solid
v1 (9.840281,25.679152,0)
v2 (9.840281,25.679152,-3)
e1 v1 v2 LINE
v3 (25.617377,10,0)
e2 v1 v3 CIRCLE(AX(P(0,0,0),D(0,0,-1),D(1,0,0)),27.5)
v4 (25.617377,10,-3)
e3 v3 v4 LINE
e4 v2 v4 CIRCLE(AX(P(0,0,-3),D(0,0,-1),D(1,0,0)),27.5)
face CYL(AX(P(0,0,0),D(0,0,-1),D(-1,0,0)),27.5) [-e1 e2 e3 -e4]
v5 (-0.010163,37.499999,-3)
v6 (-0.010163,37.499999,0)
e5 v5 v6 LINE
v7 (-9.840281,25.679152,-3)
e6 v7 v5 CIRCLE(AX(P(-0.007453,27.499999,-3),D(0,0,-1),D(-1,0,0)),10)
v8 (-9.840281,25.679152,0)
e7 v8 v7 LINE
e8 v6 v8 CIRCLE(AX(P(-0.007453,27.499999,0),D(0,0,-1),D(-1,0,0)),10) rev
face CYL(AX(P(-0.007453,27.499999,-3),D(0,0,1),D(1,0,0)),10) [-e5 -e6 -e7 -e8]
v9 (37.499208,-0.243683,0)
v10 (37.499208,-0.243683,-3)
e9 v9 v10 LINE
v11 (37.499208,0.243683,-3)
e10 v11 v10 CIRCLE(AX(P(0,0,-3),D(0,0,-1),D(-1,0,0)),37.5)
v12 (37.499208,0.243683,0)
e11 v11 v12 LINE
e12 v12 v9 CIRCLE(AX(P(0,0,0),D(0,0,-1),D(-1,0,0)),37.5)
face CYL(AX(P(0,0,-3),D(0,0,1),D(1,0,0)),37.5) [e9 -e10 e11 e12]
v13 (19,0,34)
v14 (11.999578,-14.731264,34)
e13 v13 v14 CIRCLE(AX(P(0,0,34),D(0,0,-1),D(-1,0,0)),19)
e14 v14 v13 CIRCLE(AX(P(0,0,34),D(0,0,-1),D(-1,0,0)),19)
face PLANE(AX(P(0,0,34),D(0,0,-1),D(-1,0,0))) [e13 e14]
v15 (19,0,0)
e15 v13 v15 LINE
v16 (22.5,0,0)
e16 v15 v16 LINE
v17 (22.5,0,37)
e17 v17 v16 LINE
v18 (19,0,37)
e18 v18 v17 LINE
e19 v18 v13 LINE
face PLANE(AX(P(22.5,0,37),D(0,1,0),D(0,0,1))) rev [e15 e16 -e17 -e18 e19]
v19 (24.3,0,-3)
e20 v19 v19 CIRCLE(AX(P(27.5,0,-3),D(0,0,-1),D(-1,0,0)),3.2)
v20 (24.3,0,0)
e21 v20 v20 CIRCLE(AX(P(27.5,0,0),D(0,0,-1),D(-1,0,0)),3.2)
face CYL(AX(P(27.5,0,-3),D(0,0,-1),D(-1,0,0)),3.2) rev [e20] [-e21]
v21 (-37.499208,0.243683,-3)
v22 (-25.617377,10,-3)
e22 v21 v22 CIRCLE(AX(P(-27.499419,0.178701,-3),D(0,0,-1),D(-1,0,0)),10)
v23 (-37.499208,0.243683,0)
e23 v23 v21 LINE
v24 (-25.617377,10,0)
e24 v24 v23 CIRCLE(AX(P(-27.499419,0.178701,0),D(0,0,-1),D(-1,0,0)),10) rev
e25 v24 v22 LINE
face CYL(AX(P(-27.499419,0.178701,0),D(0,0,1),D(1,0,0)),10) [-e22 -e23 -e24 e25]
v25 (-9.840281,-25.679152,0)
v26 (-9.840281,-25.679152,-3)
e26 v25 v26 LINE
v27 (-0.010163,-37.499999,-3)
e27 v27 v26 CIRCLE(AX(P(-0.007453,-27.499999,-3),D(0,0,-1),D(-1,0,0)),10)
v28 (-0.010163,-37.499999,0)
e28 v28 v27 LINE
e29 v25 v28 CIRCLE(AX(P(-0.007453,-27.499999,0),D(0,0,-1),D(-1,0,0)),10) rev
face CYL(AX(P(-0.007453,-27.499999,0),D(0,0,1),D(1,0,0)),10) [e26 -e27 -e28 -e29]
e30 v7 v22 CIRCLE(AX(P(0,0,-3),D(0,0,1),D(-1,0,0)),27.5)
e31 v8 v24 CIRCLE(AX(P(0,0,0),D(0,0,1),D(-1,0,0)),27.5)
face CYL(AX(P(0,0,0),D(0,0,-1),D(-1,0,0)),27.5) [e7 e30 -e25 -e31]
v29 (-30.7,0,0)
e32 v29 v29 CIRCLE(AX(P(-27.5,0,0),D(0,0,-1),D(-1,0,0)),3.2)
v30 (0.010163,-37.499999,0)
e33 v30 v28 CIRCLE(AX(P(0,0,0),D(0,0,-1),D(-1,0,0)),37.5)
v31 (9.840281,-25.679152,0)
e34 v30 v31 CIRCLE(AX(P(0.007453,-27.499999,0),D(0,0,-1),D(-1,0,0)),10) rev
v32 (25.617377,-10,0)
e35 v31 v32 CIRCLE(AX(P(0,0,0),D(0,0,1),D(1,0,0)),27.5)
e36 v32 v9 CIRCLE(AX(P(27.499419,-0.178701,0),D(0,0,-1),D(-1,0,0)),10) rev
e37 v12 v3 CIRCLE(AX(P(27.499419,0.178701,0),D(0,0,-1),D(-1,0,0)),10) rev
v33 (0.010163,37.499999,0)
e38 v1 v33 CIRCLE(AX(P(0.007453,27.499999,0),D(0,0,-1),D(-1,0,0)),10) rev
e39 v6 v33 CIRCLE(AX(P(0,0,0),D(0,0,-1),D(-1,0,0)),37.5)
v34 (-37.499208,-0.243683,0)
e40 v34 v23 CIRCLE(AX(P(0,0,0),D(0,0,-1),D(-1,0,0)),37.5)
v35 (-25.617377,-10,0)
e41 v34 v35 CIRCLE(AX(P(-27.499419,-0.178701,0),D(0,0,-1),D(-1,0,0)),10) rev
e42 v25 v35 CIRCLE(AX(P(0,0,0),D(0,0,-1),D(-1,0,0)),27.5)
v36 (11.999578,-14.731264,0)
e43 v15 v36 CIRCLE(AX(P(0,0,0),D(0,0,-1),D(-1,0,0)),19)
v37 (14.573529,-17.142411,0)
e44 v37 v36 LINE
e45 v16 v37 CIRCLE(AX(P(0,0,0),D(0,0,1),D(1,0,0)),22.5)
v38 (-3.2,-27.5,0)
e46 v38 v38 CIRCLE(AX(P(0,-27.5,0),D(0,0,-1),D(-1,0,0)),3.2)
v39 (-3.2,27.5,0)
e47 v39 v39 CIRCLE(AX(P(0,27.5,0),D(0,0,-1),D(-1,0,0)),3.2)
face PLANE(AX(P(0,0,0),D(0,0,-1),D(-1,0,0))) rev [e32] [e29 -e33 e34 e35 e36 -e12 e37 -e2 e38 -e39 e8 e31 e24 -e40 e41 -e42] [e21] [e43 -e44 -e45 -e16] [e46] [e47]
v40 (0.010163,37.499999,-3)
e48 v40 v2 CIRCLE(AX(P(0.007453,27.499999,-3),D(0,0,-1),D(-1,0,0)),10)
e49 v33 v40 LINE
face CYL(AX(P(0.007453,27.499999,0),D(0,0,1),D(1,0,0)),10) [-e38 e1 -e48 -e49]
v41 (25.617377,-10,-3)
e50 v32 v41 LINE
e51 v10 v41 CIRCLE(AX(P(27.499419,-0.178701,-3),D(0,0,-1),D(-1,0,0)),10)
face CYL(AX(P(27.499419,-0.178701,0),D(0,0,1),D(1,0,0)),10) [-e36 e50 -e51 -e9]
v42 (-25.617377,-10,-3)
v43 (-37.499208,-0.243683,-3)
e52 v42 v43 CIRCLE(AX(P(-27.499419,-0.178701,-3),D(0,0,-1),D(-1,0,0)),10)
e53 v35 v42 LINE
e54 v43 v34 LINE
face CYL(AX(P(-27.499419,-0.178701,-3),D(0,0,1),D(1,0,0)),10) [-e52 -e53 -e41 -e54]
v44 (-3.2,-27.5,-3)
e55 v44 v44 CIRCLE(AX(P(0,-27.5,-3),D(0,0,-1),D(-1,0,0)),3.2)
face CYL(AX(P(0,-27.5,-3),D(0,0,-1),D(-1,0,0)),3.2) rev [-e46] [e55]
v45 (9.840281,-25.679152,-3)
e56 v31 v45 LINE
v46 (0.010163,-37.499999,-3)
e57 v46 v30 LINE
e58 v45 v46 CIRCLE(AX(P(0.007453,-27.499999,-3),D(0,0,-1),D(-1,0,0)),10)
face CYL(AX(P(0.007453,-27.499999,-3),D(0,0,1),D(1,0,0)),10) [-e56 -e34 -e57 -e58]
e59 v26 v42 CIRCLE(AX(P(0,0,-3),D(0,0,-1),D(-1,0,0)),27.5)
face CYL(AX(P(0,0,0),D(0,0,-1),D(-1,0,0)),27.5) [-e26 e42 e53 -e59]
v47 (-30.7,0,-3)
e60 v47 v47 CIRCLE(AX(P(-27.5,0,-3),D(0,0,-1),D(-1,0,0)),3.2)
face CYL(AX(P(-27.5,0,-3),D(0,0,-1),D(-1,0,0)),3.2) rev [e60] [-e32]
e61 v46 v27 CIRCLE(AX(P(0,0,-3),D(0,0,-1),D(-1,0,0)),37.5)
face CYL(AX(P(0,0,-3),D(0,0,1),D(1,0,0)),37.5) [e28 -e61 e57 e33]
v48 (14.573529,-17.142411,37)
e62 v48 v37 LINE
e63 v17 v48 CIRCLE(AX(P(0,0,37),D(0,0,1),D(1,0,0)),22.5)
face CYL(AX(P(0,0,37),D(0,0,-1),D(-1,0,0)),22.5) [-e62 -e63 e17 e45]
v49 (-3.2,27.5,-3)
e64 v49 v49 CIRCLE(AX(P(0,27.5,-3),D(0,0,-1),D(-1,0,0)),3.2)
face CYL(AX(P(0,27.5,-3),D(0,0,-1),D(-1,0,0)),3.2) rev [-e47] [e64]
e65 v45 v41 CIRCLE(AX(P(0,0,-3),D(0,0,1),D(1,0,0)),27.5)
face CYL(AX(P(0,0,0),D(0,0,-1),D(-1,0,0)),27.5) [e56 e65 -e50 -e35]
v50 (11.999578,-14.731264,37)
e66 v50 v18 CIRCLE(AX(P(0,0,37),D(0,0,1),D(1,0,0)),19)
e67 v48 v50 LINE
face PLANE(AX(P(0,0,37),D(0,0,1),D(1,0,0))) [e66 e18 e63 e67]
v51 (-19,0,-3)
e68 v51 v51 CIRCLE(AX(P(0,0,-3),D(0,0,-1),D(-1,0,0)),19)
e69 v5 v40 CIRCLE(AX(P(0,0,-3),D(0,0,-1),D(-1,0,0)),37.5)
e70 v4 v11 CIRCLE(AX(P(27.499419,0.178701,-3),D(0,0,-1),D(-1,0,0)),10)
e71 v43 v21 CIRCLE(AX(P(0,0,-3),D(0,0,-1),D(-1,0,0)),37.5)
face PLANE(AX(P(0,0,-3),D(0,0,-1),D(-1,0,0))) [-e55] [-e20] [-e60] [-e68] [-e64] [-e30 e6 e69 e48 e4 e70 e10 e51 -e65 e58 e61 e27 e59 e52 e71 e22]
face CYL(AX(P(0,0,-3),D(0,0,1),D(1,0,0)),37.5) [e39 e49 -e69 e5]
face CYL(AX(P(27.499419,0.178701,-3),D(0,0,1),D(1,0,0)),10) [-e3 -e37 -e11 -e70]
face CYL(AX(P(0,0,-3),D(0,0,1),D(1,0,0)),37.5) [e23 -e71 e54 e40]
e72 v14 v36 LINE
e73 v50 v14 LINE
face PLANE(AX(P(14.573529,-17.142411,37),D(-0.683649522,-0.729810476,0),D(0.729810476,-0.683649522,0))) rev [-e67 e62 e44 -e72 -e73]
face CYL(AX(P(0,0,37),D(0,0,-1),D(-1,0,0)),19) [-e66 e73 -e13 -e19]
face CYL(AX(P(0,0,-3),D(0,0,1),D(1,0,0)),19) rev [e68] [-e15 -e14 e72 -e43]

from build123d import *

# Parameters (mm, degrees)
ESQUISSE1_R                  = 22.5
BOSS_EXTRU_1_DEPTH           = 37
ENL_V_MAT_EXTRU_1_DEPTH      = 3
ENL_V_MAT_EXTRU_1_DEPTH_BACK = 34
ESQUISSE4_R                  = 19
ENL_V_MAT_EXTRU_3_DEPTH      = 49.80061475
ESQUISSE9_R                  = 37.5
BOSS_EXTRU_2_DEPTH           = 3
ENL_V_START                  = 3
ESQUISSE4_2_R                = 19
ENL_V_MAT_EXTRU_4_DEPTH      = 3
D_GAGEMENT_M61_D             = 6.4
ENL_V_START_2                = -3
ENL_V_MAT_EXTRU_5_DEPTH      = 3
CONG_1_R                     = 10
CONG_1_OF_SYM_TRIE4_R        = 10
SYM_TRIE5_START              = -3
SYM_TRIE5_DEPTH              = 3


# Read off the part's stored shape, not the designer's step: Symétrie5
with BuildPart() as part:
    # Esquisse1 → Boss.-Extru.1 (new body)
    with BuildSketch(Plane.XY):
        Circle(ESQUISSE1_R)
    extrude(amount=BOSS_EXTRU_1_DEPTH)

    # Esquisse4 → Enlèv. mat.-Extru.1 (cut, two sides: drawn at the far end of the back side and taken through both)
    with BuildSketch(Plane(origin=(0, 0, 0), x_dir=(-1, 0, 0), z_dir=(0, 0, -1)).offset(-ENL_V_MAT_EXTRU_1_DEPTH_BACK)):
        with Locations(Location((0, 0, 0), (0, 0, 180))):
            Circle(ESQUISSE4_R)
    extrude(amount=ENL_V_MAT_EXTRU_1_DEPTH + ENL_V_MAT_EXTRU_1_DEPTH_BACK, mode=Mode.SUBTRACT)

    # Esquisse7 → Enlèv. mat.-Extru.3 (cut, through all)
    with BuildSketch(Plane(origin=(0, 0, 0), x_dir=(-1, 0, 0), z_dir=(0, 0, -1))):
        with BuildLine():
            Line((-14.573529274, -17.142410697), (-11.999578126, -14.731263517))
            ThreePointArc((-11.999578126, -14.731263517), (-17.160885531, -8.154998946), (-19, 0))
            Line((-19, 0), (-22.5, 0))
            ThreePointArc((-22.5, 0), (-20.422468125, -9.443134843), (-14.573529274, -17.142410697))
        make_face()
    extrude(amount=-ENL_V_MAT_EXTRU_3_DEPTH, mode=Mode.SUBTRACT)

    # Esquisse9 → Boss.-Extru.2 (add)
    with BuildSketch(Plane(origin=(0, 0, 0), x_dir=(-1, 0, 0), z_dir=(0, 0, -1))):
        Circle(ESQUISSE9_R)
    extrude(amount=BOSS_EXTRU_2_DEPTH)

    # Esquisse4<2> → Enlèv. mat.-Extru.4 (cut)
    with BuildSketch(Plane(origin=(0, 0, 0), x_dir=(-1, 0, 0), z_dir=(0, 0, -1)).offset(ENL_V_START)):
        with Locations(Location((0, 0, 0), (0, 0, 180))):
            Circle(ESQUISSE4_2_R)
    extrude(amount=-ENL_V_MAT_EXTRU_4_DEPTH, mode=Mode.SUBTRACT)

    # Dégagement M61 (through all)
    with Locations(Plane(origin=(0, 0, -3), x_dir=(-1, 0, 0), z_dir=(0, 0, -1))):
        with Locations((0, 27.5), (27.5, 0), (0, -27.5), (-27.5, 0)):
            Hole(D_GAGEMENT_M61_D / 2)

    # Esquisse15 → Enlèv. mat.-Extru.5 (cut)
    with BuildSketch(Plane(origin=(0, 0, -3), x_dir=(-1, 0, 0), z_dir=(0, 0, -1)).offset(ENL_V_START_2)):
        with BuildLine():
            Line((34.932786702, 13.636363636), (25.617376915, 10))
            ThreePointArc((25.617376915, 10), (19.384796538, 19.505887911), (9.840281362, 25.679152297))
            Line((9.840281362, 25.679152297), (12.051640076, 35.51067405))
            ThreePointArc((12.051640076, 35.51067405), (25.913422274, 27.106171734), (34.932786702, 13.636363636))
        make_face()
    enl_v_mat_extru_5 = extrude(amount=ENL_V_MAT_EXTRU_5_DEPTH, mode=Mode.SUBTRACT)

    # Congé1
    # the kernel refuses this fillet: 10 mm, written as the material it takes off along each edge
    with BuildSketch(Plane(origin=(-12.051640076, 35.51067405, 30.511737931), x_dir=(0.9866266204606564, 0.16299666192405335, 0), z_dir=(0, 0, -1))) as cong_1_piece_1:
        with BuildLine():
            CenterArc((10.577402483, 9.866707582), CONG_1_R, 178.889666711, 100.475681696)
            Line((0.579280147, 10.060485169), (0.3793177, 10.064360721))
            ThreePointArc((0.3793177, 10.064360721), (0.089970794, 5.04173949), (-0.199669279, 0.011496906))
            Line((-0.199669279, 0.011496906), (-0.032545854, -0.197334152))
            ThreePointArc((-0.032545854, -0.197334152), (6.102347586, -0.699846569), (12.237241026, -0.197334152))
            Line((12.237241026, -0.197334152), (12.204695172, 0))
        make_face()
    extrude(amount=64.023475862, mode=Mode.SUBTRACT)
    with BuildSketch(Plane(origin=(-34.932786702, 13.636363636, 34.090909091), x_dir=(-0.18820424606330075, -0.9821299108385533, 0), z_dir=(0, 0, -1))) as cong_1_piece_2:
        with BuildLine():
            CenterArc((11.818181818, -9.83332166), CONG_1_R, 79.524318304, 100.475681696)
            Line((1.818181818, -9.83332166), (1.618181818, -9.83332166))
            ThreePointArc((1.618181818, -9.83332166), (0.712424476, -4.953024467), (-0.196666433, -0.036363636))
            Line((-0.196666433, -0.036363636), (-0.036363636, 0.196666433))
            ThreePointArc((-0.036363636, 0.196666433), (6.818181818, 0.825043774), (13.672727273, 0.196666433))
            Line((13.672727273, 0.196666433), (13.636363636, 0))
        make_face()
    extrude(amount=71.181818182, mode=Mode.SUBTRACT)

    # Symétrie4: Enlèv. mat.-Extru.5 across plane
    add(enl_v_mat_extru_5.mirror(Plane(origin=(0, 0, 0), x_dir=(0, 0, 1), z_dir=(1, 0, 0))), mode=Mode.SUBTRACT)

    # Congé1 of Symétrie4
    # the kernel refuses this fillet: 10 mm, written as the material it takes off along each edge
    with BuildSketch(Plane(origin=(12.051640076, 35.51067405, 30.511737931), x_dir=(-0.9866266204606562, 0.1629966619240532, 0), z_dir=(0, 0, -1))) as cong_1_of_sym_trie4_piece_1:
        with BuildLine():
            CenterArc((10.577402483, -9.866707582), CONG_1_OF_SYM_TRIE4_R, 80.634651593, 100.475681696)
            Line((0.579280147, -10.060485169), (0.3793177, -10.064360721))
            ThreePointArc((0.3793177, -10.064360721), (0.089970794, -5.04173949), (-0.199669279, -0.011496906))
            Line((-0.199669279, -0.011496906), (-0.032545854, 0.197334152))
            ThreePointArc((-0.032545854, 0.197334152), (6.102347586, 0.699846569), (12.237241026, 0.197334152))
            Line((12.237241026, 0.197334152), (12.204695172, 0))
        make_face()
    extrude(amount=64.023475862, mode=Mode.SUBTRACT)
    with BuildSketch(Plane(origin=(34.932786702, 13.636363636, 34.090909091), x_dir=(0.18820424606330144, -0.982129910838553, 0), z_dir=(0, 0, -1))) as cong_1_of_sym_trie4_piece_2:
        with BuildLine():
            CenterArc((11.818181818, 9.83332166), CONG_1_OF_SYM_TRIE4_R, 180, 100.475681696)
            Line((1.818181818, 9.83332166), (1.618181818, 9.83332166))
            ThreePointArc((1.618181818, 9.83332166), (0.712424476, 4.953024467), (-0.196666433, 0.036363636))
            Line((-0.196666433, 0.036363636), (-0.036363636, -0.196666433))
            ThreePointArc((-0.036363636, -0.196666433), (6.818181818, -0.825043774), (13.672727273, -0.196666433))
            Line((13.672727273, -0.196666433), (13.636363636, 0))
        make_face()
    extrude(amount=71.181818182, mode=Mode.SUBTRACT)

    # Symétrie5 outline → Symétrie5 (cut)
    with BuildSketch(Plane.XY.offset(SYM_TRIE5_START)):
        with BuildLine():
            ThreePointArc((-0.010162924, -37.499998623), (-7.696247071, -33.893936965), (-9.840281362, -25.679152297))
            ThreePointArc((-9.840281362, -25.679152297), (-19.384796538, -19.505887911), (-25.617376915, -10))
            ThreePointArc((-25.617376915, -10), (-33.845353653, -7.907162456), (-37.499208239, -0.243683034))
            ThreePointArc((-37.499208239, -0.243683034), (-26.433813461, -26.59893806), (-0.010162924, -37.499998623))
        make_face()
        with BuildLine():
            ThreePointArc((9.840281362, -25.679152297), (7.696247071, -33.893936965), (0.010162924, -37.499998623))
            ThreePointArc((0.010162924, -37.499998623), (26.433813461, -26.59893806), (37.499208239, -0.243683034))
            ThreePointArc((37.499208239, -0.243683034), (33.845353653, -7.907162456), (25.617376915, -10))
            ThreePointArc((25.617376915, -10), (19.384796538, -19.505887911), (9.840281362, -25.679152297))
        make_face()
    extrude(amount=SYM_TRIE5_DEPTH, mode=Mode.SUBTRACT)


solid = part.part
